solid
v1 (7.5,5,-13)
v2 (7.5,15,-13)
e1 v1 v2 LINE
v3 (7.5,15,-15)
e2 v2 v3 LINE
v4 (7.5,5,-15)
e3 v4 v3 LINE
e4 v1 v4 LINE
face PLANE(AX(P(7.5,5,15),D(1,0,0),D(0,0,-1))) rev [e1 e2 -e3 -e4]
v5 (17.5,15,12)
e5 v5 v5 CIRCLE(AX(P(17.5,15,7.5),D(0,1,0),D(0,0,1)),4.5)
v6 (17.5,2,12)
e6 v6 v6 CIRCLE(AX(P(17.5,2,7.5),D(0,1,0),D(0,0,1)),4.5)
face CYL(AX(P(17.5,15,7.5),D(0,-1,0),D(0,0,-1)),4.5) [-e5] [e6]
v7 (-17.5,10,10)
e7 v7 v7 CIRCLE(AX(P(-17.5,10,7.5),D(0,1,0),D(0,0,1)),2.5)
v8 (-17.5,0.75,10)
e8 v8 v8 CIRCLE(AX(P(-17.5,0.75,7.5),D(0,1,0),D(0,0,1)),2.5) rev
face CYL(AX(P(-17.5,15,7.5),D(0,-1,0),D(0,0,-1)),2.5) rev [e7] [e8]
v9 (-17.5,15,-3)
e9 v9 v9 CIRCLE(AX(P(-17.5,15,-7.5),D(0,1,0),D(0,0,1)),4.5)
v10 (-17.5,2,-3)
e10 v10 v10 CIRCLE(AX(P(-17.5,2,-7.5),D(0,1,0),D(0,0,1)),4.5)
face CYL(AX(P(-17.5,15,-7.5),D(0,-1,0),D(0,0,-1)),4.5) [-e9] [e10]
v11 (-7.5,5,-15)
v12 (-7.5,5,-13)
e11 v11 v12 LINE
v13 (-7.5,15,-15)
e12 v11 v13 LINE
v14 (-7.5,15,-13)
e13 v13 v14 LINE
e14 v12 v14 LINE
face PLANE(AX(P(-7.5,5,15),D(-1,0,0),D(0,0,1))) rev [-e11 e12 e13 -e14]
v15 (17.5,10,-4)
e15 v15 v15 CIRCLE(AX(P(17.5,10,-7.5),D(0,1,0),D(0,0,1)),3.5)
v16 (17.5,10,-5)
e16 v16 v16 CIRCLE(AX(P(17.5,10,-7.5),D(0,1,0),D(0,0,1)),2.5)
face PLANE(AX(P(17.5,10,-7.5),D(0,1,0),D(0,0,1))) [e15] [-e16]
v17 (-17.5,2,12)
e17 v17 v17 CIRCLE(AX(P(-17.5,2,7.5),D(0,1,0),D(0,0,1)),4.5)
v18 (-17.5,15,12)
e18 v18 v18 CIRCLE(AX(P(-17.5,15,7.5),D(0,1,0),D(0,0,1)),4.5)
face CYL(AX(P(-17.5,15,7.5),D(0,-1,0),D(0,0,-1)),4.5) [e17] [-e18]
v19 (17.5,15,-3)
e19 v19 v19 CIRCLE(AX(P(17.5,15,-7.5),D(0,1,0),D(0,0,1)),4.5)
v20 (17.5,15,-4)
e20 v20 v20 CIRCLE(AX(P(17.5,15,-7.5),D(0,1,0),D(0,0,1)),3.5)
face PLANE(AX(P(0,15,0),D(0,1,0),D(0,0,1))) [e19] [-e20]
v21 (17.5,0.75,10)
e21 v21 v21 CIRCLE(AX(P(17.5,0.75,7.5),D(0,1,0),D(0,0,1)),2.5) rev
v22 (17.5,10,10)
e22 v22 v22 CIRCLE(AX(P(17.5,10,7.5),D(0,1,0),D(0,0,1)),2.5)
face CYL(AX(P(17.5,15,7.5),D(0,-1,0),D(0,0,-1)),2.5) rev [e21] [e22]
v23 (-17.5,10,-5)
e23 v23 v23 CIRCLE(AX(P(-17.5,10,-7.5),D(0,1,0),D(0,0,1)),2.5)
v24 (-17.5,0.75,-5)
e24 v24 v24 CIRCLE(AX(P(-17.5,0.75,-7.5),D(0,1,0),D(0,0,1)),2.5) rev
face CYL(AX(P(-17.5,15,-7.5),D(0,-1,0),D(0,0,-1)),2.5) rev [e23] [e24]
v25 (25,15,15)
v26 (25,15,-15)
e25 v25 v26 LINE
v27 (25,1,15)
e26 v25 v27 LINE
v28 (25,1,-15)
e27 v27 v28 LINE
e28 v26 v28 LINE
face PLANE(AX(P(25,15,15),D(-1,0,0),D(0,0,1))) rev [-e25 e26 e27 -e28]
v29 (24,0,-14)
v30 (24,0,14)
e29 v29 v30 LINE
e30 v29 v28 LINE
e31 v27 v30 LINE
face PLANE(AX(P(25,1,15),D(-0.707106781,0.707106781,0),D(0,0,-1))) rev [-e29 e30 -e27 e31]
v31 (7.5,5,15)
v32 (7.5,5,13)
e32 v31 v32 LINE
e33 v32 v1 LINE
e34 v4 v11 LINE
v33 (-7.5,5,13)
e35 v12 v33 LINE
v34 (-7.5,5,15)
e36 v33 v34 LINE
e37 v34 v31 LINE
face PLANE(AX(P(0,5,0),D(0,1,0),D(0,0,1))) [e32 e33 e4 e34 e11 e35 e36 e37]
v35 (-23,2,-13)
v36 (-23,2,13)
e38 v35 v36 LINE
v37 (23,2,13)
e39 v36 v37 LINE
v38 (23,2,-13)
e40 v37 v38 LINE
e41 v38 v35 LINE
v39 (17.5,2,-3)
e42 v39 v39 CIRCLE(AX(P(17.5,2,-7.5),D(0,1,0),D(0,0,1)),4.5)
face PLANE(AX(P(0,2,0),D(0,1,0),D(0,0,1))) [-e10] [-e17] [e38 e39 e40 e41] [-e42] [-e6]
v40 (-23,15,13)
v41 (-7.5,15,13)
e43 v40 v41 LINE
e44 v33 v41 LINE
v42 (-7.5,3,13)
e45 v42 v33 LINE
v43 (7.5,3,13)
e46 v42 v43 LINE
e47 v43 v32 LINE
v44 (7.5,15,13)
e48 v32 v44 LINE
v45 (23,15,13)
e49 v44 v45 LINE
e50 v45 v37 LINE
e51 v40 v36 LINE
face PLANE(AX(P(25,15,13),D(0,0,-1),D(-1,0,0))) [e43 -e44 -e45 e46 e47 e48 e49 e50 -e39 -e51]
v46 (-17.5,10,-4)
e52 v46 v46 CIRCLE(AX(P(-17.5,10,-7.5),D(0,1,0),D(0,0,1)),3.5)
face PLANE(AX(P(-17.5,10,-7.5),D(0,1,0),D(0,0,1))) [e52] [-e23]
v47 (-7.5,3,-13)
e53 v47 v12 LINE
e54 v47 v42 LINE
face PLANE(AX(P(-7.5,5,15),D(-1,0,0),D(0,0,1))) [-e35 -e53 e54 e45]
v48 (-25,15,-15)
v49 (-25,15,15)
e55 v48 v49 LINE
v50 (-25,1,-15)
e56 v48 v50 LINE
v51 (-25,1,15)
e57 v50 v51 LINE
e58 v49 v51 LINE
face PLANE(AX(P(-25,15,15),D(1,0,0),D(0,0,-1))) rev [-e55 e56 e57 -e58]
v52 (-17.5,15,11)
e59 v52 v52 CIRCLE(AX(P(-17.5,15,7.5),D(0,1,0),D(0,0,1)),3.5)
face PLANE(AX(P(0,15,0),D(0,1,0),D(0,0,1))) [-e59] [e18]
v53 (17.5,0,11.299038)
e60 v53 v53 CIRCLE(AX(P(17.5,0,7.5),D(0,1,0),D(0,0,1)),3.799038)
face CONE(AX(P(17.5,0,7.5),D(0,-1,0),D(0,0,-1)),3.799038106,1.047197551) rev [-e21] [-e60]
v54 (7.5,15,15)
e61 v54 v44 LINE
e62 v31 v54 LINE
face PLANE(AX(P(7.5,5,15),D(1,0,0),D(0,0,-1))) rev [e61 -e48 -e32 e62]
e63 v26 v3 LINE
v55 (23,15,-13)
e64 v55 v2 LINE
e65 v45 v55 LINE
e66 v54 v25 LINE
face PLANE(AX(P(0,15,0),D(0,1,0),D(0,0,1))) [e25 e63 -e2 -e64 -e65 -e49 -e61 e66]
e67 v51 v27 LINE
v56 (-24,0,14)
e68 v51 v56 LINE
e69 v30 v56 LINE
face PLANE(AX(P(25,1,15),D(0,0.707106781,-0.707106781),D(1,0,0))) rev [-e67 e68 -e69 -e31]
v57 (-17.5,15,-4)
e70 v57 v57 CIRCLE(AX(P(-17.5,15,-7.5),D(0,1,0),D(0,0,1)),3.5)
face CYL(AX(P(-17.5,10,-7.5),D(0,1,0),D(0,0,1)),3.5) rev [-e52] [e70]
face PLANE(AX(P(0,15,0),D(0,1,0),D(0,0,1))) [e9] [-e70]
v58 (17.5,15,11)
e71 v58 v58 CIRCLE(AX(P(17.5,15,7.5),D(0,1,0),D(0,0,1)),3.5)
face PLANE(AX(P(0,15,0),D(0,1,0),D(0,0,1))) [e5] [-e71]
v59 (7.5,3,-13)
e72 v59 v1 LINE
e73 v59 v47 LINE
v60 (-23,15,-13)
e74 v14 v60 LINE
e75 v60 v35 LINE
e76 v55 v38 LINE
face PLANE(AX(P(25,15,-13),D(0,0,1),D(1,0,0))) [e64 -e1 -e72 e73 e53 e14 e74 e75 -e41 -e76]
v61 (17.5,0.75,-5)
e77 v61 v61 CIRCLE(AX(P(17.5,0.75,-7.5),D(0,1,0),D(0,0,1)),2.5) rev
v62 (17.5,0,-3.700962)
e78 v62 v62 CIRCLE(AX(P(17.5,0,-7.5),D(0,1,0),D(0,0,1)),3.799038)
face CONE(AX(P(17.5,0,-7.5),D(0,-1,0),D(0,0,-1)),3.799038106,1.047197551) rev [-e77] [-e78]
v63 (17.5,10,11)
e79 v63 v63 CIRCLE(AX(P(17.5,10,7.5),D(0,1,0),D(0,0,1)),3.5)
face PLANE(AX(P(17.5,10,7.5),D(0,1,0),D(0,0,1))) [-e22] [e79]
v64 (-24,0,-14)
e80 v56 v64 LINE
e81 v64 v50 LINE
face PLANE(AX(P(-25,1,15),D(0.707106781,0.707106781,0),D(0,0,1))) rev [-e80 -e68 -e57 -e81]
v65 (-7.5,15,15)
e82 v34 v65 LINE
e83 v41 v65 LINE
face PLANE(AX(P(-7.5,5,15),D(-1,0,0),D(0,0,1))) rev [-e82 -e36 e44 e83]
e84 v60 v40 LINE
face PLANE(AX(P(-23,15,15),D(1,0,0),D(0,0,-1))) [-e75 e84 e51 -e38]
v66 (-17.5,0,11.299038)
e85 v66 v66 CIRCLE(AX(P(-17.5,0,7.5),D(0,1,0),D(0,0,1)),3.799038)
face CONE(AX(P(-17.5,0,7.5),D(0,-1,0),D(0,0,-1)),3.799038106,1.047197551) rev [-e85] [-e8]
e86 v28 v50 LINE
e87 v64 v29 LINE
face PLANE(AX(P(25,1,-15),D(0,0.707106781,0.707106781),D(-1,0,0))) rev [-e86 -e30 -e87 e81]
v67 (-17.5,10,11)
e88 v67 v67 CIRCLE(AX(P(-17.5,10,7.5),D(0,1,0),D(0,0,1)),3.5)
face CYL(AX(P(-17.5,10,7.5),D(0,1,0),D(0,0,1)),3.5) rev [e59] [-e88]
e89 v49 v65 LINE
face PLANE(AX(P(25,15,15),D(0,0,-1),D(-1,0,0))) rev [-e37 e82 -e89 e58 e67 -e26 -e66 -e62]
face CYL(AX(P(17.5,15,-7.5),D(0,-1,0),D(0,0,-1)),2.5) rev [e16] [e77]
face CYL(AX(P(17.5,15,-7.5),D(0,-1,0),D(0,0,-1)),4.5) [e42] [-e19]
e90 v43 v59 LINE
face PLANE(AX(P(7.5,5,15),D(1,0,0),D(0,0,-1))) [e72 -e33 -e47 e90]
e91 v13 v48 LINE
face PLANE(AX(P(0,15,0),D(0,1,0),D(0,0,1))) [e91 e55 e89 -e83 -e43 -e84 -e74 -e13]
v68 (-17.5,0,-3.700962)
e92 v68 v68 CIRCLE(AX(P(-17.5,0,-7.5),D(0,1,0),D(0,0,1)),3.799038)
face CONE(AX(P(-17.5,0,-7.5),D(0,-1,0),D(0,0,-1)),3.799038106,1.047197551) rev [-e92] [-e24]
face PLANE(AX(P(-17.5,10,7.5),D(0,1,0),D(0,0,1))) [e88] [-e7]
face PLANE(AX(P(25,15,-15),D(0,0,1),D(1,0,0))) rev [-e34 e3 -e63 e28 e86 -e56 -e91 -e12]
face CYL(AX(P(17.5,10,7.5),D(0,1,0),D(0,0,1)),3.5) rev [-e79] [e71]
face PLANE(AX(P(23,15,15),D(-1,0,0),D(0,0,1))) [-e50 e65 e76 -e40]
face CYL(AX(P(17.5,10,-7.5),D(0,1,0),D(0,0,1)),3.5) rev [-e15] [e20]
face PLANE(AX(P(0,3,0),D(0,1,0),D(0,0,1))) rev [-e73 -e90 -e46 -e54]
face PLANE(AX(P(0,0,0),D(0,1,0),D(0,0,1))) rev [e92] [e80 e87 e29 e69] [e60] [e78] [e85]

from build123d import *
from OCP.BRepFilletAPI import BRepFilletAPI_MakeChamfer

# Parameters (mm, degrees)
SKETCH1_W           = 50
SKETCH1_H           = 30
SKETCH1_R           = 2.5
BOSS_EXTRUDE1_DEPTH = 15
SKETCH2_W           = 15
SKETCH2_H           = 30
CUT_EXTRUDE1_DEPTH  = 10
CHAMFER1_SIZE       = 0.75
CHAMFER1_SIZE2      = 1.299038106
SHELL1_START        = 2
SHELL1_OUTLINE_W    = 15.5
SHELL1_OUTLINE_H    = 26
SHELL1_OUTLINE_R    = 4.5
SHELL1_DEPTH        = 13
SHELL1_2_OUTLINE_W  = 15
SHELL1_2_OUTLINE_H  = 26
SHELL1_2_DEPTH      = 1
SKETCH3_R           = 3.5
CUT_EXTRUDE2_DEPTH  = 5
SKETCH4_R           = 3.5
CUT_EXTRUDE3_DEPTH  = 5
SKETCH5_R           = 3.5
CUT_EXTRUDE4_DEPTH  = 5
SKETCH6_R           = 3.5
CUT_EXTRUDE5_DEPTH  = 5
CHAMFER2_SIZE       = 1


# Read off the part's stored shape, not the designer's step: Shell1
with BuildPart() as part:
    # Sketch1 → Boss-Extrude1 (new body)
    with BuildSketch(Plane(origin=(0, 0, 0), x_dir=(1, 0, 0), z_dir=(0, 1, 0))):
        Rectangle(SKETCH1_W, SKETCH1_H)
        with Locations(Location((-17.5, 7.5, 0), (0, 0, 270))):
            Circle(SKETCH1_R, mode=Mode.SUBTRACT)
        with Locations(Location((17.5, 7.5, 0), (0, 0, 90))):
            Circle(SKETCH1_R, mode=Mode.SUBTRACT)
        with Locations(Location((17.5, -7.5, 0), (0, 0, 270))):
            Circle(SKETCH1_R, mode=Mode.SUBTRACT)
        with Locations(Location((-17.5, -7.5, 0), (0, 0, 90))):
            Circle(SKETCH1_R, mode=Mode.SUBTRACT)
    extrude(amount=BOSS_EXTRUDE1_DEPTH)

    # Sketch2 → Cut-Extrude1 (cut)
    with BuildSketch(Plane(origin=(0, 15, 0), x_dir=(1, 0, 0), z_dir=(0, 1, 0))):
        Rectangle(SKETCH2_W, SKETCH2_H)
    extrude(amount=-CUT_EXTRUDE1_DEPTH, mode=Mode.SUBTRACT)

    # Chamfer1: one chamfer whose edges measure the first distance from different faces: ONE call of the kernel's chamfer builder (chamfer() names one face for all edges)
    chamfer1_edges_1 = [part.edges().sort_by_distance(p)[0] for p in [
        (-17.5, 0, -10),
    ]]
    chamfer1_side_1 = [part.faces().sort_by_distance(p)[0] for p in [
        (-17.5, 7.5, -10),
    ]]
    chamfer1_edges_2 = [part.edges().sort_by_distance(p)[0] for p in [
        (17.5, 0, -5),
    ]]
    chamfer1_side_2 = [part.faces().sort_by_distance(p)[0] for p in [
        (17.5, 7.5, -5),
    ]]
    chamfer1_edges_3 = [part.edges().sort_by_distance(p)[0] for p in [
        (17.5, 0, 5),
    ]]
    chamfer1_side_3 = [part.faces().sort_by_distance(p)[0] for p in [
        (17.5, 7.5, 5),
    ]]
    chamfer1_edges_4 = [part.edges().sort_by_distance(p)[0] for p in [
        (-17.5, 0, 10),
    ]]
    chamfer1_side_4 = [part.faces().sort_by_distance(p)[0] for p in [
        (-17.5, 7.5, 10),
    ]]
    chamfer1 = BRepFilletAPI_MakeChamfer(part.part.solid().wrapped)
    for e in chamfer1_edges_1:
        chamfer1.Add(CHAMFER1_SIZE, CHAMFER1_SIZE2, e.wrapped, chamfer1_side_1[0].wrapped)  # the first distance lies on this face
    for e in chamfer1_edges_2:
        chamfer1.Add(CHAMFER1_SIZE, CHAMFER1_SIZE2, e.wrapped, chamfer1_side_2[0].wrapped)  # the first distance lies on this face
    for e in chamfer1_edges_3:
        chamfer1.Add(CHAMFER1_SIZE, CHAMFER1_SIZE2, e.wrapped, chamfer1_side_3[0].wrapped)  # the first distance lies on this face
    for e in chamfer1_edges_4:
        chamfer1.Add(CHAMFER1_SIZE, CHAMFER1_SIZE2, e.wrapped, chamfer1_side_4[0].wrapped)  # the first distance lies on this face
    add(Compound.cast(chamfer1.Shape()), mode=Mode.REPLACE)

    # Shell1 outline → Shell1 (cut)
    # profile 1 of 2: a face of its own
    with BuildSketch(Plane(origin=(0, 0, 0), x_dir=(1, 0, 0), z_dir=(0, 1, 0)).offset(SHELL1_START)):
        with Locations((-15.25, 0)):
            Rectangle(SHELL1_OUTLINE_W, SHELL1_OUTLINE_H)
        with Locations((-17.5, -7.5)):
            Circle(SHELL1_OUTLINE_R, mode=Mode.SUBTRACT)
        with Locations((-17.5, 7.5)):
            Circle(SHELL1_OUTLINE_R, mode=Mode.SUBTRACT)
    # profile 2 of 2: a face of its own
    with BuildSketch(Plane(origin=(0, 0, 0), x_dir=(1, 0, 0), z_dir=(0, 1, 0)).offset(SHELL1_START)):
        with Locations((15.25, 0)):
            Rectangle(SHELL1_OUTLINE_W, SHELL1_OUTLINE_H)
        with Locations((17.5, -7.5)):
            Circle(SHELL1_OUTLINE_R, mode=Mode.SUBTRACT)
        with Locations((17.5, 7.5)):
            Circle(SHELL1_OUTLINE_R, mode=Mode.SUBTRACT)
    extrude(amount=SHELL1_DEPTH, mode=Mode.SUBTRACT)

    # Shell1 2 outline → Shell1 2 (cut)
    with BuildSketch(Plane(origin=(0, 0, 0), x_dir=(1, 0, 0), z_dir=(0, 1, 0)).offset(SHELL1_START)):
        Rectangle(SHELL1_2_OUTLINE_W, SHELL1_2_OUTLINE_H)
    extrude(amount=SHELL1_2_DEPTH, mode=Mode.SUBTRACT)

    # Sketch3 → Cut-Extrude2 (cut)
    with BuildSketch(Plane(origin=(0, 15, 0), x_dir=(1, 0, 0), z_dir=(0, 1, 0))):
        with Locations(Location((-17.5, -7.5, 0), (0, 0, 270))):
            Circle(SKETCH3_R)
    extrude(amount=-CUT_EXTRUDE2_DEPTH, mode=Mode.SUBTRACT)

    # Sketch4 → Cut-Extrude3 (cut)
    with BuildSketch(Plane(origin=(0, 15, 0), x_dir=(1, 0, 0), z_dir=(0, 1, 0))):
        with Locations(Location((-17.5, 7.5, 0), (0, 0, 270))):
            Circle(SKETCH4_R)
    extrude(amount=-CUT_EXTRUDE3_DEPTH, mode=Mode.SUBTRACT)

    # Sketch5 → Cut-Extrude4 (cut)
    with BuildSketch(Plane(origin=(0, 15, 0), x_dir=(1, 0, 0), z_dir=(0, 1, 0))):
        with Locations(Location((17.5, 7.5, 0), (0, 0, 270))):
            Circle(SKETCH5_R)
    extrude(amount=-CUT_EXTRUDE4_DEPTH, mode=Mode.SUBTRACT)

    # Sketch6 → Cut-Extrude5 (cut)
    with BuildSketch(Plane(origin=(0, 15, 0), x_dir=(1, 0, 0), z_dir=(0, 1, 0))):
        with Locations(Location((17.5, -7.5, 0), (0, 0, 270))):
            Circle(SKETCH6_R)
    extrude(amount=-CUT_EXTRUDE5_DEPTH, mode=Mode.SUBTRACT)

    # Chamfer2
    chamfer2_edges = [part.edges().sort_by_distance(p)[0] for p in [
        (0, 0, -15),
        (25, 0, 0),
        (0, 0, 15),
        (-25, 0, 0),
    ]]
    chamfer(chamfer2_edges, length=CHAMFER2_SIZE)


solid = part.part
